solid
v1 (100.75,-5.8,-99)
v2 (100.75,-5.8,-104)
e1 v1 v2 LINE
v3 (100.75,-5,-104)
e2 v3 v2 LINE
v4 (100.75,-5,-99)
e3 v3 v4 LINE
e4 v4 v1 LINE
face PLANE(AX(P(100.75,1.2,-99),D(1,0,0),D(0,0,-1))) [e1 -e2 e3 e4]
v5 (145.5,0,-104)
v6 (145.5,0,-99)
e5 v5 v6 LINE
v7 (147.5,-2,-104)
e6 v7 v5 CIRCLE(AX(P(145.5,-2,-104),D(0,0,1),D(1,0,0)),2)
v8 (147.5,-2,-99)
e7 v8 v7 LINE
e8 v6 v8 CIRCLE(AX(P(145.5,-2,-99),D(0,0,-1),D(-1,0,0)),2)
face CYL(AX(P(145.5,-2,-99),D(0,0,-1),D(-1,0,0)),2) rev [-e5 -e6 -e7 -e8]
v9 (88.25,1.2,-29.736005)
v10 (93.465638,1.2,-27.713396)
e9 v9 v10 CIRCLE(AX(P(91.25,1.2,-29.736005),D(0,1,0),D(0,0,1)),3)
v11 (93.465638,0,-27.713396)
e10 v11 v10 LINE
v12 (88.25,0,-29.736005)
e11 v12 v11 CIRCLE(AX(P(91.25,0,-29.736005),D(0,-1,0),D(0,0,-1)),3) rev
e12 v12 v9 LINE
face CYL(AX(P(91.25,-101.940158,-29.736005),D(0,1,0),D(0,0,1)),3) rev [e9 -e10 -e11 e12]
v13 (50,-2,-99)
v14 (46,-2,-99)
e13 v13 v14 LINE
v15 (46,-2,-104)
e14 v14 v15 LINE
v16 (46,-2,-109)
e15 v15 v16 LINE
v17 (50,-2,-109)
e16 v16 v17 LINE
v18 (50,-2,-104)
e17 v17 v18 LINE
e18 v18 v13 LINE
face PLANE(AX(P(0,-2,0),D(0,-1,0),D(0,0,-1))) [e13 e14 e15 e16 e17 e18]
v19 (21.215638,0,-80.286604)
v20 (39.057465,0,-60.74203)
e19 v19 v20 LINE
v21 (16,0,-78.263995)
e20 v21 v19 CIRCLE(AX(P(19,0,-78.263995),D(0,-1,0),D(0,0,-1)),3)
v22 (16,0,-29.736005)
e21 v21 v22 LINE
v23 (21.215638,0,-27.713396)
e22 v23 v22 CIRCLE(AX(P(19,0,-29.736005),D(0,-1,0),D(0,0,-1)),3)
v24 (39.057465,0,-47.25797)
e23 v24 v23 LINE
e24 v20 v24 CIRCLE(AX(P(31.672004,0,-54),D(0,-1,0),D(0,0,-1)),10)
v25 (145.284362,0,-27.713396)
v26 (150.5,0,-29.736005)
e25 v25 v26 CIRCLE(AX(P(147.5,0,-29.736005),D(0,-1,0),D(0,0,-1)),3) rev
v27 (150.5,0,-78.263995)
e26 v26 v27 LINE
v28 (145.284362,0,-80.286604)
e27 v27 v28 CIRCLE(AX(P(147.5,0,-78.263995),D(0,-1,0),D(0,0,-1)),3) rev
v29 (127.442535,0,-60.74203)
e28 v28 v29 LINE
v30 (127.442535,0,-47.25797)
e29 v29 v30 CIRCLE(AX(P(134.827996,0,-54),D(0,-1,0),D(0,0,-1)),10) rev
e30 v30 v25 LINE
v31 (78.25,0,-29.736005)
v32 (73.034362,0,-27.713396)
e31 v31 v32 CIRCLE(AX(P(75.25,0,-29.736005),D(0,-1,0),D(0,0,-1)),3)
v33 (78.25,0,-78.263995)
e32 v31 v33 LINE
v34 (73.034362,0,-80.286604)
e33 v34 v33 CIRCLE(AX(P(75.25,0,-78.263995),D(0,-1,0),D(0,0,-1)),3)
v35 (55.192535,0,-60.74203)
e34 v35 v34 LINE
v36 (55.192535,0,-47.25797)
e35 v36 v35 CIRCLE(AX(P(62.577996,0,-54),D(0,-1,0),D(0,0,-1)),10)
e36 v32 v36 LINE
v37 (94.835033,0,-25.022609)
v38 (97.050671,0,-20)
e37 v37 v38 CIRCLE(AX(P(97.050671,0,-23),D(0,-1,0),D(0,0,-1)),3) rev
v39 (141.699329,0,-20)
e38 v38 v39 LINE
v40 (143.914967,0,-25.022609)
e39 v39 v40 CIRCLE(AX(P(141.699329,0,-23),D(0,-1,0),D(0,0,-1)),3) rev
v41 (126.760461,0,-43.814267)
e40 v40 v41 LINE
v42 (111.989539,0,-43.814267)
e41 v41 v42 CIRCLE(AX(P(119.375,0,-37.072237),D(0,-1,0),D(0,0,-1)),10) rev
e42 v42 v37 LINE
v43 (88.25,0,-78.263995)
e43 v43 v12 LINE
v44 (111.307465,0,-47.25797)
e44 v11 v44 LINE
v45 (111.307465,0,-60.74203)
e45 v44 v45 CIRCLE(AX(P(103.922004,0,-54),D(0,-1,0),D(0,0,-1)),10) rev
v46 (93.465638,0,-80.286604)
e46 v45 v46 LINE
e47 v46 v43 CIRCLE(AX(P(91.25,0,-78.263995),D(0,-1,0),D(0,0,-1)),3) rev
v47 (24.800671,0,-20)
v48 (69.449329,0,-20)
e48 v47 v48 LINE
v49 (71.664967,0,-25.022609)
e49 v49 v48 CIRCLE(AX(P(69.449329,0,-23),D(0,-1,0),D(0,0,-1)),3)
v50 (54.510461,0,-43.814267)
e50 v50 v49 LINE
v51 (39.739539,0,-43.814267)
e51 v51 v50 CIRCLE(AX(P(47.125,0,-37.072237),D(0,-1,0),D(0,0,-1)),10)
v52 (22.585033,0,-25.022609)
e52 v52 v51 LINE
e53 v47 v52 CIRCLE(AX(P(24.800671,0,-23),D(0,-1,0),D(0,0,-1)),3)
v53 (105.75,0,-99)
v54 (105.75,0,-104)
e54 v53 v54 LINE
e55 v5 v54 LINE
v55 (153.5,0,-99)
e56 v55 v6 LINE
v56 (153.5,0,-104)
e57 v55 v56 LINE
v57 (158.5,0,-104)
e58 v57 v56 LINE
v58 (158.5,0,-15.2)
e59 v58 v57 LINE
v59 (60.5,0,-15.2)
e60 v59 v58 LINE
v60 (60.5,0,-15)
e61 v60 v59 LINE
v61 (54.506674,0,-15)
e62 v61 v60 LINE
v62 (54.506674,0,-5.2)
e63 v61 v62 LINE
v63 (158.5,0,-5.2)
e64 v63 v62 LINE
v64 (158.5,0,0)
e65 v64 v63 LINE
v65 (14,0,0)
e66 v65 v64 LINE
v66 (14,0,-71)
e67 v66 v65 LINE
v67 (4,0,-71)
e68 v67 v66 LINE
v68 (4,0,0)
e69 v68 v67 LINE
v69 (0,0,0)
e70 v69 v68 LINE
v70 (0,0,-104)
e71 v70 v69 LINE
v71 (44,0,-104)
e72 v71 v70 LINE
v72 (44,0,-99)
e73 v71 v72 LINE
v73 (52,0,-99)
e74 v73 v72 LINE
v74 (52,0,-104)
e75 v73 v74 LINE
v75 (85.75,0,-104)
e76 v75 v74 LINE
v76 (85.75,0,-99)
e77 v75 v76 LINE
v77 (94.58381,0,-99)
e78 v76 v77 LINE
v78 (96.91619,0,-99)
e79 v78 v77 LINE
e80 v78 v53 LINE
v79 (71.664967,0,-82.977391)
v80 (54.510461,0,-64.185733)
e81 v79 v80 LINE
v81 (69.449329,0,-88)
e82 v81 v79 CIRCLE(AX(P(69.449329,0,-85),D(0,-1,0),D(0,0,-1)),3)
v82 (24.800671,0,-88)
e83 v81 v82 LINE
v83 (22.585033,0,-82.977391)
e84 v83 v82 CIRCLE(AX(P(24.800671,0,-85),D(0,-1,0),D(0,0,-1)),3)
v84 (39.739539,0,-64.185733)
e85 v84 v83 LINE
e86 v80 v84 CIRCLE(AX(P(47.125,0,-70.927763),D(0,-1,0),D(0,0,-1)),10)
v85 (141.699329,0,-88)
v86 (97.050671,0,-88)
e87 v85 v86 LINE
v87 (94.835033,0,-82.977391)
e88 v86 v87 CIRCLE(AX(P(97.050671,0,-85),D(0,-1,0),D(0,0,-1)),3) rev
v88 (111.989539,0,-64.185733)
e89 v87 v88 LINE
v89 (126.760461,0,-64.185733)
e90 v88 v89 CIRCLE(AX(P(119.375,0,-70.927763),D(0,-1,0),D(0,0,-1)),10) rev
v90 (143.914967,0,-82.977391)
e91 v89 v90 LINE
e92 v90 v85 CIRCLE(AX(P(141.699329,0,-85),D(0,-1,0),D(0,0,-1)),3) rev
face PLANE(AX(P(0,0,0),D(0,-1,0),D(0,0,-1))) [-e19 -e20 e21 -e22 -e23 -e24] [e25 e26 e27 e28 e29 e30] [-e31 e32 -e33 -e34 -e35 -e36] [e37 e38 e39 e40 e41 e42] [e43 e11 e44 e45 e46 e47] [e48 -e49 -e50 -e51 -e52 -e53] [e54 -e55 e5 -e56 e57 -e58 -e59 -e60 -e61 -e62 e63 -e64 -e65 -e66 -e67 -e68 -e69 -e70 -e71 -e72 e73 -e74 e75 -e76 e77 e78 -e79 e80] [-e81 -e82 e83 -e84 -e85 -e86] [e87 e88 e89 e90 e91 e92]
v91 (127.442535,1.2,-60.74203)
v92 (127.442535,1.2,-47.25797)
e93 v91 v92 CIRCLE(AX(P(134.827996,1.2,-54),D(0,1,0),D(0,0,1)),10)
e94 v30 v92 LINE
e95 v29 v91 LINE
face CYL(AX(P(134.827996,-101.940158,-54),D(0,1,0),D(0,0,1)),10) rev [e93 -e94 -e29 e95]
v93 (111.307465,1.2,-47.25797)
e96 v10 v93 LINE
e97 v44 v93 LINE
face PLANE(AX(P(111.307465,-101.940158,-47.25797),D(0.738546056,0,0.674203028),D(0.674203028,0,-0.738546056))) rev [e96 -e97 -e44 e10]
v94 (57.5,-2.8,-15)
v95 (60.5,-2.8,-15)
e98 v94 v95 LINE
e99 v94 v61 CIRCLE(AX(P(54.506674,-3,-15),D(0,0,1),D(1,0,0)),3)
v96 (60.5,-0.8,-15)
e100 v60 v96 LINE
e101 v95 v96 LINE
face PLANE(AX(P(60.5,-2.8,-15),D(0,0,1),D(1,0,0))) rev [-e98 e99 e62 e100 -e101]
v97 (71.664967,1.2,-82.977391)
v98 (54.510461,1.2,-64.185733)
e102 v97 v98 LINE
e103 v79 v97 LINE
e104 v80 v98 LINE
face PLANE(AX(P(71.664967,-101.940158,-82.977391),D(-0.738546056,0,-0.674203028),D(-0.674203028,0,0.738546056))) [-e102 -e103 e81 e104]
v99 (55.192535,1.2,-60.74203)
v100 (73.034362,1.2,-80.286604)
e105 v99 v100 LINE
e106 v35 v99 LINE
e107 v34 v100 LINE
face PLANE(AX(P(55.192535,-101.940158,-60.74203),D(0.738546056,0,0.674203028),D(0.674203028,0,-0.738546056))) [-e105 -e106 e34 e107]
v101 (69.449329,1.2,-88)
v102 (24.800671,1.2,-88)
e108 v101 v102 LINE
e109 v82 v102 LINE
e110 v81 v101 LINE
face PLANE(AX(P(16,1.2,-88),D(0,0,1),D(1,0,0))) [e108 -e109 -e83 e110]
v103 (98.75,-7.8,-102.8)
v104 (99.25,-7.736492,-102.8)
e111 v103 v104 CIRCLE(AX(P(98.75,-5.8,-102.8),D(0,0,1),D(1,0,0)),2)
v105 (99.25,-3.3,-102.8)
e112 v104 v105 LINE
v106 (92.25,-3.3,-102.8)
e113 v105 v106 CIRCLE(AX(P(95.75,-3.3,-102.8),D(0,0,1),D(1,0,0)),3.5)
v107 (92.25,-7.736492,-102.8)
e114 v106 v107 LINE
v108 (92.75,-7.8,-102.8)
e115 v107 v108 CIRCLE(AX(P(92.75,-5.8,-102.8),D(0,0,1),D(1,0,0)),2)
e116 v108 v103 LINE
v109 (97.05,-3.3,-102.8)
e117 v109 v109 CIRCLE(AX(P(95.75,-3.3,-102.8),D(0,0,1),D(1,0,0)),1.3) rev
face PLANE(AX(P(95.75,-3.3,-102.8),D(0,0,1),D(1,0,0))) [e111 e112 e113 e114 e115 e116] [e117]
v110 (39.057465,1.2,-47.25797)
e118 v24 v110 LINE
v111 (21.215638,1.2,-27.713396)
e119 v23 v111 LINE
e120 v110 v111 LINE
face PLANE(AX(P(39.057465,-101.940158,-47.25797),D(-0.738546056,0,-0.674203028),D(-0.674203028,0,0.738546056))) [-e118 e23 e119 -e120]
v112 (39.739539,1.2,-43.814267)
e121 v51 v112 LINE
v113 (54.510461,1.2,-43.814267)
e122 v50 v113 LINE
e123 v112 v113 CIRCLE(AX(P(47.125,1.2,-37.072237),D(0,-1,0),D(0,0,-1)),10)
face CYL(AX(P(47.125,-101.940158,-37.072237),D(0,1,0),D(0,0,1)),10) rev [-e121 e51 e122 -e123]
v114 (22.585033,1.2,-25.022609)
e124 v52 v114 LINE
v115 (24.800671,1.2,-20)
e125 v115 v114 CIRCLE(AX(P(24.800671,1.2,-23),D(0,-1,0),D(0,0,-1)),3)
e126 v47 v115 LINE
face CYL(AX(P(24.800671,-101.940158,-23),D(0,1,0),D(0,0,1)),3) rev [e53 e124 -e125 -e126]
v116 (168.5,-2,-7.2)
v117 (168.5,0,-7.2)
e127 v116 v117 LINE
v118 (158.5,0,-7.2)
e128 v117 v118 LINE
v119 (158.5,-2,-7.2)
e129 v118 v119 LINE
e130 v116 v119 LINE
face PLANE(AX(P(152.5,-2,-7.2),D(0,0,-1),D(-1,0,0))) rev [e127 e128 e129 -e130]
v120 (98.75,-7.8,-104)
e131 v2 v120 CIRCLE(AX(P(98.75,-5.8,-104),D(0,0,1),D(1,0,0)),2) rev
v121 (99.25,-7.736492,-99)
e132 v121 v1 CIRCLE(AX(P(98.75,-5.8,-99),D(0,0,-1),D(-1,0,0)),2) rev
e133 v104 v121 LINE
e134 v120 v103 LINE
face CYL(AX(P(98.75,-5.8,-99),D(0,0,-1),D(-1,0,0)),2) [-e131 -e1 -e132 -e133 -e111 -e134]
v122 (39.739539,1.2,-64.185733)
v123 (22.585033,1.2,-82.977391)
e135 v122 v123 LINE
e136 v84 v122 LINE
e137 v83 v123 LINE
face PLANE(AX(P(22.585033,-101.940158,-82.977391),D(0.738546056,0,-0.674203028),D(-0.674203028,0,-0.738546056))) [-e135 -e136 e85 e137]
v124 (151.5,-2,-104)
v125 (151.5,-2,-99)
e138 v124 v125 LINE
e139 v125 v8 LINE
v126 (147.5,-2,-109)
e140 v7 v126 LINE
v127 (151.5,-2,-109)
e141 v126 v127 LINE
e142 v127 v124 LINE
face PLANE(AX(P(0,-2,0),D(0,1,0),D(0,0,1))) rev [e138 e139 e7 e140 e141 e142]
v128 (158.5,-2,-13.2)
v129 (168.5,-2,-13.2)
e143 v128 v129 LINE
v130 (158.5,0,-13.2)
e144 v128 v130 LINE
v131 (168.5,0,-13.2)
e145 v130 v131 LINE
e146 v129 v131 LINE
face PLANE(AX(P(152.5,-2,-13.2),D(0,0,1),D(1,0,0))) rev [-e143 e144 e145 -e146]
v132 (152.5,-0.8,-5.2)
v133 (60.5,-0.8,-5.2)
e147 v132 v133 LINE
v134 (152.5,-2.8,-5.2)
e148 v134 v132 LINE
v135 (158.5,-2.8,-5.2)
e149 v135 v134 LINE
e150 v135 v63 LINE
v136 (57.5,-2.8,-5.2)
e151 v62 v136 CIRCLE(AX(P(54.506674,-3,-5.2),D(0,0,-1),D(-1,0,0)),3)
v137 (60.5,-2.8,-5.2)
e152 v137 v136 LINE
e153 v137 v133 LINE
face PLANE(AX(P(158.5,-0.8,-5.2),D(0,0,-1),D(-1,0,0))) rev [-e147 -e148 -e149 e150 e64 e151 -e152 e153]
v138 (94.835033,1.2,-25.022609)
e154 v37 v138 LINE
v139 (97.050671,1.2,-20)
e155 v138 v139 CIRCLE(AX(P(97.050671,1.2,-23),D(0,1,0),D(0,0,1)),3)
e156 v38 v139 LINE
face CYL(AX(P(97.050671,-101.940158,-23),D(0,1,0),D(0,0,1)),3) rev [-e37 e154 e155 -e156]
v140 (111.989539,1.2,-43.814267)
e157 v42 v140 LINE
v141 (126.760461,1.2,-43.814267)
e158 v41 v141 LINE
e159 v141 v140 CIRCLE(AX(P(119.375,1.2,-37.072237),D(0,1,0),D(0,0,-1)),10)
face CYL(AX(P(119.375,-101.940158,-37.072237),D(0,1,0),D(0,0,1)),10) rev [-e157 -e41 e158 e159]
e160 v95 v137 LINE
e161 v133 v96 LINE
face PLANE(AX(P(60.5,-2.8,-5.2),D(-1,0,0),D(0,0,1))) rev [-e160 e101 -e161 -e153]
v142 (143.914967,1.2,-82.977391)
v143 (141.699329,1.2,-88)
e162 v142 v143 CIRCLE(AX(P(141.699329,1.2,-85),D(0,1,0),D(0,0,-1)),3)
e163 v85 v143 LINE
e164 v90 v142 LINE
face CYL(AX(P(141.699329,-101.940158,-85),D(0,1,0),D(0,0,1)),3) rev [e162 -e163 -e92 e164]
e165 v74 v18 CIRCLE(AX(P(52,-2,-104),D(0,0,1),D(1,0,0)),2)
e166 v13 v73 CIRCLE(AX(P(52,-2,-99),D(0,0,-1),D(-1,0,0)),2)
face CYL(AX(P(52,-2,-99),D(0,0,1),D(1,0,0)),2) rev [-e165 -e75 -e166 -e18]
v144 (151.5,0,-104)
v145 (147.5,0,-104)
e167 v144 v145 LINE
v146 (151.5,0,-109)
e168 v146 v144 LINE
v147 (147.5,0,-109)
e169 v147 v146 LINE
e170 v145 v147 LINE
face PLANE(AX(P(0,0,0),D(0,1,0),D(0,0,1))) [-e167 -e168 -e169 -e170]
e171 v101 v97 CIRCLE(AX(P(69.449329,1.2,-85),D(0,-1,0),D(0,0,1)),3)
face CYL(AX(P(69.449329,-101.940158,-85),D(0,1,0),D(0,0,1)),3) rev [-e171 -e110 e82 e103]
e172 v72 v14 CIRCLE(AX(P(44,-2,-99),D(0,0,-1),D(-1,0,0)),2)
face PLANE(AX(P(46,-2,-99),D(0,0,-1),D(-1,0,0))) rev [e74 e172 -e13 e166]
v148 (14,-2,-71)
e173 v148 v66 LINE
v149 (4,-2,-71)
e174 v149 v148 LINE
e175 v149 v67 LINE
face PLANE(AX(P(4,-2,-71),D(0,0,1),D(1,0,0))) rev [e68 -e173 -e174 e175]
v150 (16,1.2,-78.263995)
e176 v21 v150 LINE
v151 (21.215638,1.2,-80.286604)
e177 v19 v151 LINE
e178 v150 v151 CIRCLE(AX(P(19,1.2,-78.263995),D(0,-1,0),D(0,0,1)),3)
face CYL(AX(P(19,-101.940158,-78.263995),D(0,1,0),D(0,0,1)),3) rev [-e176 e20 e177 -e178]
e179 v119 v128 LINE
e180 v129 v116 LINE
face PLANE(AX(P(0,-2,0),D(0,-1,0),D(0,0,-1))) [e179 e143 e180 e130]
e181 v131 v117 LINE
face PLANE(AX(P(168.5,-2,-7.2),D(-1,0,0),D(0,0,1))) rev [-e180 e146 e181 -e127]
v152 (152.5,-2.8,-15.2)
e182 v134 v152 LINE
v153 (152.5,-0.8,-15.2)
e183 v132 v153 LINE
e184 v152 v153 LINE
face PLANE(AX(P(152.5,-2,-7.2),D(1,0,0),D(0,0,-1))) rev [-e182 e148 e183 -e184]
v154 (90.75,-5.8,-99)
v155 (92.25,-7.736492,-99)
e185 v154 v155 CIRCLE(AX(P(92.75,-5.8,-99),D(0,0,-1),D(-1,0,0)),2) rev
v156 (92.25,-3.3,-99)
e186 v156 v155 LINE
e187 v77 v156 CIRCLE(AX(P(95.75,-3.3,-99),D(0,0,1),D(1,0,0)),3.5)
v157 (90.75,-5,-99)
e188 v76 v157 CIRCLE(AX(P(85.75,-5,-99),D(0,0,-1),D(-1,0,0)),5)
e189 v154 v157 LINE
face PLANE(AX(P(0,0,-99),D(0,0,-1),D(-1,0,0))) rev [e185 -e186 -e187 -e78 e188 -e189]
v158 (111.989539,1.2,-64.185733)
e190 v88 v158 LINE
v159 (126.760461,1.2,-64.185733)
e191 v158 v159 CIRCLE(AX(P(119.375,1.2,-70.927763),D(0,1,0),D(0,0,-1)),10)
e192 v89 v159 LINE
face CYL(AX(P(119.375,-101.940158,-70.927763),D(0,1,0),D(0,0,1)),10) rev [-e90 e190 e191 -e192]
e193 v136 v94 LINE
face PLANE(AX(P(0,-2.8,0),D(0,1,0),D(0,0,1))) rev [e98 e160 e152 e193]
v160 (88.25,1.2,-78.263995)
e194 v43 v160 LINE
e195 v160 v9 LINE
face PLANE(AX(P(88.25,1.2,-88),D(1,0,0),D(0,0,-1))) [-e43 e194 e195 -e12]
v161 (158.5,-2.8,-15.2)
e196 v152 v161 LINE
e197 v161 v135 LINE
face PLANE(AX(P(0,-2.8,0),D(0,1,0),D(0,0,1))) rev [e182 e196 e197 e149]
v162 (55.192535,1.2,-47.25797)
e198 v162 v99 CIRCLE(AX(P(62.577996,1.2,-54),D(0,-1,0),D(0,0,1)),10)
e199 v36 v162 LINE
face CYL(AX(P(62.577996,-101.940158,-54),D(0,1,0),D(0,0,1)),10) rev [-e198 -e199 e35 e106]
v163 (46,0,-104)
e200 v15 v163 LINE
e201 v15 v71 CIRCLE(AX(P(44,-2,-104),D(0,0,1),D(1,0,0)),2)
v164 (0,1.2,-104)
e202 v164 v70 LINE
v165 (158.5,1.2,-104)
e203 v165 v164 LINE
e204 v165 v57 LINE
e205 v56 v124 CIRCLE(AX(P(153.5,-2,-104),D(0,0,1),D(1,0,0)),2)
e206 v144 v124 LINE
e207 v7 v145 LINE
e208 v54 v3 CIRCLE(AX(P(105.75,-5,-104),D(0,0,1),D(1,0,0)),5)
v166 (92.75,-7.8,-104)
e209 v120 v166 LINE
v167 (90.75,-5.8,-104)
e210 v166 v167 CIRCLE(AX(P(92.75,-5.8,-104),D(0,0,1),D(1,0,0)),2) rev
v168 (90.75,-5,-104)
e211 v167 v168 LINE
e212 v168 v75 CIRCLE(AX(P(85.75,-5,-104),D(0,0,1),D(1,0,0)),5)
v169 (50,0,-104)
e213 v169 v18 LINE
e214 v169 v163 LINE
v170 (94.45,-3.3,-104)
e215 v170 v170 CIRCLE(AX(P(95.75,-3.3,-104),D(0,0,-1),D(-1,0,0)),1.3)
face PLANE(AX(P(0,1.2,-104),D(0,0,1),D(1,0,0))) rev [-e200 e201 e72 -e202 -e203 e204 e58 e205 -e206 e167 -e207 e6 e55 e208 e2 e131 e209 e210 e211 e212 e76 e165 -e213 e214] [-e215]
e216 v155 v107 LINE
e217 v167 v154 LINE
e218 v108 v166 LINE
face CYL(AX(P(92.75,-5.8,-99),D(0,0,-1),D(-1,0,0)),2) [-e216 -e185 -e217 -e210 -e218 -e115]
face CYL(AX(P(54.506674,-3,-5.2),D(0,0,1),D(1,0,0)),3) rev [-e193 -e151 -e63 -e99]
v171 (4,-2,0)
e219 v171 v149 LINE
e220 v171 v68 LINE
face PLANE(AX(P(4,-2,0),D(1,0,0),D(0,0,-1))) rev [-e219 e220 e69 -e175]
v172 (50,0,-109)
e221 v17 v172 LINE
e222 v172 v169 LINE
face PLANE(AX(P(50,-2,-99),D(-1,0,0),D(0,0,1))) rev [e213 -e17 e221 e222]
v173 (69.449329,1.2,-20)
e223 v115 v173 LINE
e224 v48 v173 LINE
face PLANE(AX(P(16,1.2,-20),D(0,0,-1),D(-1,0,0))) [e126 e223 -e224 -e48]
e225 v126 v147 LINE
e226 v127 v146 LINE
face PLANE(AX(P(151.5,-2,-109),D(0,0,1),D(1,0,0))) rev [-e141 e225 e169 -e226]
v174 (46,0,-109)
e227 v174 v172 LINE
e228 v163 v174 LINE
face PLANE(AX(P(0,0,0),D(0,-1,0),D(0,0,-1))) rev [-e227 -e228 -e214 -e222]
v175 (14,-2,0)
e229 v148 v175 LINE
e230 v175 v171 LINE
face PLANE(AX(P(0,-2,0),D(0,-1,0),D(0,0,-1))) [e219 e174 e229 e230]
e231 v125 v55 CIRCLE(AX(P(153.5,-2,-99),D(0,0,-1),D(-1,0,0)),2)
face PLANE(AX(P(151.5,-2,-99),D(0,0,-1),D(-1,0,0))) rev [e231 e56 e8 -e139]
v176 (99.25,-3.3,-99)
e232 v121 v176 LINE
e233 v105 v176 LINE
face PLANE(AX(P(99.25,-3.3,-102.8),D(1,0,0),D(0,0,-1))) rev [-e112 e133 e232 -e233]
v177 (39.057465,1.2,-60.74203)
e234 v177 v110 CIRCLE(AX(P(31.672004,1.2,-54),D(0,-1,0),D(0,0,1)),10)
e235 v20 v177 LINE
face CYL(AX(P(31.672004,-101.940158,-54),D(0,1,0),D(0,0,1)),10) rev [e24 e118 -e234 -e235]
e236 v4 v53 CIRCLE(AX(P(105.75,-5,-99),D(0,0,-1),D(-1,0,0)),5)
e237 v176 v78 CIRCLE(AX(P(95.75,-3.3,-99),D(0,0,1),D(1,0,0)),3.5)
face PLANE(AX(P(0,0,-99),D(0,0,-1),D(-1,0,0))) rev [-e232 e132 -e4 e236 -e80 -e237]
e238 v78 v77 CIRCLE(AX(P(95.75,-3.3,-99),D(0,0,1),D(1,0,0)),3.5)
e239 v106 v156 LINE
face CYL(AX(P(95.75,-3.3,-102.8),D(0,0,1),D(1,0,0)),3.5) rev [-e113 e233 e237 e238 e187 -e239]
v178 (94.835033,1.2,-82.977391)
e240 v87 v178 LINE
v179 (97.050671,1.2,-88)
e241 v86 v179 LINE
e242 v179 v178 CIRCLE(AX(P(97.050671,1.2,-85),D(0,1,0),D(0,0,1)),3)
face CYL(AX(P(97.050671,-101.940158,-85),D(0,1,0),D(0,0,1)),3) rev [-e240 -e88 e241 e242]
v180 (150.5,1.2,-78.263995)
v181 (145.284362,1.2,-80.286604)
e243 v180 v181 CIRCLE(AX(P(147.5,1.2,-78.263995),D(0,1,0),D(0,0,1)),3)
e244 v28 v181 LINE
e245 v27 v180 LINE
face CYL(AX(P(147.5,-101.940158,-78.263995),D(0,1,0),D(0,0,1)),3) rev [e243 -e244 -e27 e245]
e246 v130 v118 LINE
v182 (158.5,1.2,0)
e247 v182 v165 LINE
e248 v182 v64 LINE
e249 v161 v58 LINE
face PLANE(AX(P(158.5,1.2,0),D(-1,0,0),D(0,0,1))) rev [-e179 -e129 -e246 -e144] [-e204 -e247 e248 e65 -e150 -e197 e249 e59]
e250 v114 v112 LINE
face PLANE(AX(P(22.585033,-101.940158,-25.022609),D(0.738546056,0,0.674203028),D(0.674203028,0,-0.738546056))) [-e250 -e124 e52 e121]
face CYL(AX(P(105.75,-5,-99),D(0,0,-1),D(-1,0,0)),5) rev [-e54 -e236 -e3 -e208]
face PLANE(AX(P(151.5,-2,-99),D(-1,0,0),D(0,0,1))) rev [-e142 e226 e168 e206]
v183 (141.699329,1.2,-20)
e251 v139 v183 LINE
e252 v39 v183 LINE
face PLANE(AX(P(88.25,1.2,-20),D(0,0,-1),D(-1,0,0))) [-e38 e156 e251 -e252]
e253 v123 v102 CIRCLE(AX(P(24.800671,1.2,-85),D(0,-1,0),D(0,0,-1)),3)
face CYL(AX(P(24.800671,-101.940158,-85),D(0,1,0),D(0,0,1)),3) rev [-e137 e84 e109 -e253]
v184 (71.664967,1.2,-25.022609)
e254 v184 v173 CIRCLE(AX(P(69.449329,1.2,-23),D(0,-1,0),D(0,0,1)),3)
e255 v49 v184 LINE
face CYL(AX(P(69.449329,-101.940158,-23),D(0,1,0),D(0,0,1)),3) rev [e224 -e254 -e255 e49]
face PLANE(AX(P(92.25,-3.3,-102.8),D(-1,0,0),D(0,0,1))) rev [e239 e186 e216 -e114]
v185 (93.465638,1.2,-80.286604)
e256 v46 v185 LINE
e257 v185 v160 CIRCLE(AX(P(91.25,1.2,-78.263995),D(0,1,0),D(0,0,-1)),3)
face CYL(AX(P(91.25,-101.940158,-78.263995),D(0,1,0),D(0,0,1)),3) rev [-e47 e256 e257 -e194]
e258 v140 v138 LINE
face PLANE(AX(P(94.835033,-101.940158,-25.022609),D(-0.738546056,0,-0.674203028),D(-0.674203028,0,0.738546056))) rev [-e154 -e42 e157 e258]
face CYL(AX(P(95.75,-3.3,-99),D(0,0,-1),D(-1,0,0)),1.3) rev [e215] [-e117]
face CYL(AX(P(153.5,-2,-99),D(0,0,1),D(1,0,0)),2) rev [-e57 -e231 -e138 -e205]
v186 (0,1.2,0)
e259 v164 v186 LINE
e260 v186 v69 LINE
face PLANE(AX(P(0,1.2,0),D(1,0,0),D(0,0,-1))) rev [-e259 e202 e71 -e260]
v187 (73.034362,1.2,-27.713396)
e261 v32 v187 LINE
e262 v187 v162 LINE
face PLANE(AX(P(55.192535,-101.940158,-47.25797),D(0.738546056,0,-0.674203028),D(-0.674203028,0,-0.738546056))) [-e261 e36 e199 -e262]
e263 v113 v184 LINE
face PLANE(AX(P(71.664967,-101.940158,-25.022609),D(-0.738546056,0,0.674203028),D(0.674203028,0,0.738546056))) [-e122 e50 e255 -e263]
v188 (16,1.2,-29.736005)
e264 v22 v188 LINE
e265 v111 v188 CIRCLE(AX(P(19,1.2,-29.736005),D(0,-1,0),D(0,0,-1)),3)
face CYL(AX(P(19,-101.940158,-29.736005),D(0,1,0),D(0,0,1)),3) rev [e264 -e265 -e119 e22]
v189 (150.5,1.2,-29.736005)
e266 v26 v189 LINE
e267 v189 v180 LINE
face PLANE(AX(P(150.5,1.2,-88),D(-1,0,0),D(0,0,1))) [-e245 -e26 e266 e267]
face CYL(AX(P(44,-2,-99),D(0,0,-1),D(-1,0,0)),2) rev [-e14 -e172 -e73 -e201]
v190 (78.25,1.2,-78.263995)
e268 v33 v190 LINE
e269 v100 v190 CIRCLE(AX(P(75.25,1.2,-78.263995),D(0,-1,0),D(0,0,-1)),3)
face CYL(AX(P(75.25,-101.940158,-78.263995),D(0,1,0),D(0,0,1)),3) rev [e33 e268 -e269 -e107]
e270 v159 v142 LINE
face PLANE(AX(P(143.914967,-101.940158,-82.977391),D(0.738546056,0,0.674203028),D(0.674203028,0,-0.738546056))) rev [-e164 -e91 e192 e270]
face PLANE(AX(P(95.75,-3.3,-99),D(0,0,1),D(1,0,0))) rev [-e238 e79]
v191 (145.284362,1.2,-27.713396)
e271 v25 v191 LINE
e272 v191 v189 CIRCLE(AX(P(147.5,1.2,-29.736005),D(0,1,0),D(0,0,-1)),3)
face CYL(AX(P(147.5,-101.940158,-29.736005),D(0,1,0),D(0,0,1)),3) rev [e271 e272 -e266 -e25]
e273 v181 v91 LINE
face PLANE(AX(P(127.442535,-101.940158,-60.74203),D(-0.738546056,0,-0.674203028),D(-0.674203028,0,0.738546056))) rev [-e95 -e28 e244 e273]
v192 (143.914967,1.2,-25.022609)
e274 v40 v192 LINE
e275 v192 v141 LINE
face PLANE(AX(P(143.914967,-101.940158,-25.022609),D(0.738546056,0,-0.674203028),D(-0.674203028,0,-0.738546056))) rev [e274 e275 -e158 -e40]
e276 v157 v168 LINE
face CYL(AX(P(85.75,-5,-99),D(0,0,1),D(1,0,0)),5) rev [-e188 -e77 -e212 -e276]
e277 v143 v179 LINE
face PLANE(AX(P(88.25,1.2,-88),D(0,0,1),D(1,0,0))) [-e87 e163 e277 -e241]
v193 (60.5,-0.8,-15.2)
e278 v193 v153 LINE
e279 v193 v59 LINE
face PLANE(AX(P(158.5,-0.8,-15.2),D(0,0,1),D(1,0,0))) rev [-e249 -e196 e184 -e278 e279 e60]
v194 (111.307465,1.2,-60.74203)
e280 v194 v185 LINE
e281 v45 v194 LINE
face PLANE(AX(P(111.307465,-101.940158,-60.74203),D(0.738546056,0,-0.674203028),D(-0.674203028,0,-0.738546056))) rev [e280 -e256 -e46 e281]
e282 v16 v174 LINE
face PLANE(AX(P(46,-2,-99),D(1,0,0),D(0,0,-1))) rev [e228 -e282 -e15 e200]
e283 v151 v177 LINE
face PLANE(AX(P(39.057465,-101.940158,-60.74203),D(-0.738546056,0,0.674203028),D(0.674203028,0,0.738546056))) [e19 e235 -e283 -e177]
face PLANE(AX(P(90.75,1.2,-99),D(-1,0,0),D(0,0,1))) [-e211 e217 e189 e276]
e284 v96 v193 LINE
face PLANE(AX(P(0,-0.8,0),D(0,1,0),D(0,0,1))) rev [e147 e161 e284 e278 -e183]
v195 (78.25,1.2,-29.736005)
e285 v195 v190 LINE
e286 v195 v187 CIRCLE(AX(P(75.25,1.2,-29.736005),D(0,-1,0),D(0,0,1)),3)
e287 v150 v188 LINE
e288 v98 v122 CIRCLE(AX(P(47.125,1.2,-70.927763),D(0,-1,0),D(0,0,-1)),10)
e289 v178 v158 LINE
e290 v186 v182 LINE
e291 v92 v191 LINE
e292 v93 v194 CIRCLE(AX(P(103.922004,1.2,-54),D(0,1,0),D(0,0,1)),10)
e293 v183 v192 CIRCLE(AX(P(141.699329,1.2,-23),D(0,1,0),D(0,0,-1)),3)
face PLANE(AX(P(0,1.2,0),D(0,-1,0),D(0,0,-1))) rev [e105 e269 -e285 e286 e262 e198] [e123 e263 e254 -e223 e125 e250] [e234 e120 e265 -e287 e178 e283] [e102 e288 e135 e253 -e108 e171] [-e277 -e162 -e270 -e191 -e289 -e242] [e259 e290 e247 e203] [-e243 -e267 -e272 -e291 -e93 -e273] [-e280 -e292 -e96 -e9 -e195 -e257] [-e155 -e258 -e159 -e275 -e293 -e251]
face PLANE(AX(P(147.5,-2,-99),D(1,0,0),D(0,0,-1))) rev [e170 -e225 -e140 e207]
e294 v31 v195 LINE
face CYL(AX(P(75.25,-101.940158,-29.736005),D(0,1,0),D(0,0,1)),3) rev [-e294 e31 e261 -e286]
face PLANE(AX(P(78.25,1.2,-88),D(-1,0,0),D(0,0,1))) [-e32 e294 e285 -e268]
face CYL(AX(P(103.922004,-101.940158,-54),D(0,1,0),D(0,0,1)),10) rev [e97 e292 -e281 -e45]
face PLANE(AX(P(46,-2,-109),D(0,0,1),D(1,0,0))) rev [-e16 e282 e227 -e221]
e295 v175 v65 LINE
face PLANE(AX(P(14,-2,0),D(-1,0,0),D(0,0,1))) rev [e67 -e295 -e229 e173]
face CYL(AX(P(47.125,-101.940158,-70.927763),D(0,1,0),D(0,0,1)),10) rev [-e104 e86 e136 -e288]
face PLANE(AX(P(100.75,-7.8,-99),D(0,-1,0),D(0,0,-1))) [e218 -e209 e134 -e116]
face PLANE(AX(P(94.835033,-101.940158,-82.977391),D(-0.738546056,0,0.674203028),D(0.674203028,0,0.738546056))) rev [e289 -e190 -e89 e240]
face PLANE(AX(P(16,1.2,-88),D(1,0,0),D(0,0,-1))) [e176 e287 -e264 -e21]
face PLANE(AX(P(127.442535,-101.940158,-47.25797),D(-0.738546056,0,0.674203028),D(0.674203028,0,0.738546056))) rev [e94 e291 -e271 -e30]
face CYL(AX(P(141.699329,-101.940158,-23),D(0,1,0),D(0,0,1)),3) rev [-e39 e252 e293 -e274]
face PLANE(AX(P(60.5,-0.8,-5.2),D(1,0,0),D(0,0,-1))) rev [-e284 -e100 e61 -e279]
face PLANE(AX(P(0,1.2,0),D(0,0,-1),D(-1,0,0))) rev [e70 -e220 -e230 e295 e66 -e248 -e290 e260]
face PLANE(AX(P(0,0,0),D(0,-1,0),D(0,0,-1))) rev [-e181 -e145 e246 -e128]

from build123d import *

# Parameters (mm, degrees)
SKETCH1_W           = 158.5
SKETCH1_H           = 104
SKETCH1_W_2         = 62.25
SKETCH1_H_2         = 68
BOSS_EXTRUDE1_DEPTH = 1.2
SKETCH2_W           = 4
SKETCH2_H           = 10
BOSS_EXTRUDE2_DEPTH = 2
FILLET1_R           = 2
SKETCH3_W           = 10
SKETCH3_H           = 9
BOSS_EXTRUDE3_DEPTH = 5
SKETCH4_R           = 1.3
CUT_EXTRUDE1_DEPTH  = 5
CUT_EXTRUDE2_DEPTH  = 3.8
FILLET2_R           = 5
FILLET3_R           = 2
SKETCH6_W           = 98
SKETCH6_H           = 10
BOSS_EXTRUDE4_DEPTH = 0.8
SKETCH8_W           = 16
SKETCH8_H           = 6
BOSS_EXTRUDE5_DEPTH = 2
SKETCH9_W           = 6
SKETCH9_H           = 10
SKETCH9_W_2         = 3
SKETCH9_H_2         = 9.8
BOSS_EXTRUDE6_DEPTH = 2.8
FILLET4_R           = 3
SKETCH11_W          = 10
SKETCH11_H          = 71
BOSS_EXTRUDE7_DEPTH = 2
BOSS_EXTRUDE8_DEPTH = 1.2


# Some blends are built 0.0001 mm under size
with BuildPart() as part:
    # Sketch1 → Boss-Extrude1 (new body)
    with BuildSketch(Plane(origin=(0, 0, 0), x_dir=(1, 0, 0), z_dir=(0, 1, 0))):
        with Locations((79.25, 52)):
            Rectangle(SKETCH1_W, SKETCH1_H)
        with Locations((119.375, 54)):
            Rectangle(SKETCH1_W_2, SKETCH1_H_2, mode=Mode.SUBTRACT)
        with Locations((47.125, 54)):
            Rectangle(SKETCH1_W_2, SKETCH1_H_2, mode=Mode.SUBTRACT)
    extrude(amount=BOSS_EXTRUDE1_DEPTH)

    # Sketch2 → Boss-Extrude2 (add)
    with BuildSketch(Plane.XZ):
        with Locations((149.5, -104)):
            Rectangle(SKETCH2_W, SKETCH2_H)
        with Locations((48, -104)):
            Rectangle(SKETCH2_W, SKETCH2_H)
    extrude(amount=BOSS_EXTRUDE2_DEPTH)

    # Fillet1
    fillet1_edges = [part.edges().sort_by_distance(p)[0] for p in [
        (50, 0, -101.5),
        (46, 0, -101.5),
        (147.5, 0, -101.5),
        (151.5, 0, -101.5),
    ]]
    fillet(fillet1_edges, radius=FILLET1_R - 0.0001)  # a hair under: the kernel refuses the full size

    # Sketch3 → Boss-Extrude3 (add)
    with BuildSketch(Plane(origin=(0, 0, -104), x_dir=(-1, 0, 0), z_dir=(0, 0, -1))):
        with Locations((-95.75, -3.3)):
            Rectangle(SKETCH3_W, SKETCH3_H)
    extrude(amount=-BOSS_EXTRUDE3_DEPTH)

    # Sketch4 → Cut-Extrude1 (cut)
    with BuildSketch(Plane(origin=(0, 0, -104), x_dir=(-1, 0, 0), z_dir=(0, 0, -1))):
        with Locations((-95.75, -3.3)):
            Circle(SKETCH4_R)
    extrude(amount=-CUT_EXTRUDE1_DEPTH, mode=Mode.SUBTRACT)

    # Sketch5 → Cut-Extrude2 (cut)
    with BuildSketch(Plane.XY.offset(-99)):
        with BuildLine():
            Line((92.25, -3.3), (92.25, -7.8))
            Line((92.25, -7.8), (99.25, -7.8))
            Line((99.25, -7.8), (99.25, -3.3))
            ThreePointArc((99.25, -3.3), (95.75, 0.2), (92.25, -3.3))
        make_face()
    extrude(amount=-CUT_EXTRUDE2_DEPTH, mode=Mode.SUBTRACT)

    # Fillet2
    fillet2_edges = [part.edges().sort_by_distance(p)[0] for p in [
        (100.75, 0, -101.5),
        (90.75, 0, -101.5),
    ]]
    fillet(fillet2_edges, radius=FILLET2_R)

    # Fillet3
    fillet3_edges = [part.edges().sort_by_distance(p)[0] for p in [
        (90.75, -7.8, -101.5),
        (100.75, -7.8, -101.5),
    ]]
    fillet(fillet3_edges, radius=FILLET3_R)

    # Sketch6 → Boss-Extrude4 (add)
    with BuildSketch(Plane.XZ):
        with Locations((109.5, -10.2)):
            Rectangle(SKETCH6_W, SKETCH6_H)
    extrude(amount=BOSS_EXTRUDE4_DEPTH)

    # Sketch8 → Boss-Extrude5 (add)
    with BuildSketch(Plane.XZ):
        with Locations((160.5, -10.2)):
            Rectangle(SKETCH8_W, SKETCH8_H)
    extrude(amount=BOSS_EXTRUDE5_DEPTH)

    # Sketch9 → Boss-Extrude6 (add)
    with BuildSketch(Plane.XZ):
        with Locations((155.5, -10.2)):
            Rectangle(SKETCH9_W, SKETCH9_H)
        with Locations((59, -10.1)):
            Rectangle(SKETCH9_W_2, SKETCH9_H_2)
    extrude(amount=BOSS_EXTRUDE6_DEPTH)

    # Fillet4
    # the kernel refuses this fillet: 3 mm, written as the material it adds along each edge
    with BuildSketch(Plane(origin=(57.5, 0, -5.2), x_dir=(-1, 0, 0), z_dir=(0, 0, -1))) as fillet4_piece_1:
        with BuildLine():
            CenterArc((2.993325909, -3), FILLET4_R, 90, 86.177446271)
            Line((0, -2.8), (-0.059866518, -2.796))
            ThreePointArc((-0.059866518, -2.796), (-0.06, -1.4), (-0.06, 0))
            Line((-0.06, 0), (0, 0.06))
            Line((0, 0.06), (2.993325909, 0.06))
            Line((2.993325909, 0.06), (2.993325909, 0))
        make_face()
    extrude(amount=9.8)

    # Sketch11 → Boss-Extrude7 (add)
    with BuildSketch(Plane.XZ):
        with Locations((9, -35.5)):
            Rectangle(SKETCH11_W, SKETCH11_H)
    extrude(amount=BOSS_EXTRUDE7_DEPTH)

    # Sketch12 → Boss-Extrude8 (add)
    with BuildSketch(Plane(origin=(0, 1.2, 0), x_dir=(1, 0, 0), z_dir=(0, 1, 0))):
        with BuildLine():
            Line((22.585033293, 82.977390915), (39.739539441, 64.185732728))
            ThreePointArc((39.739539441, 64.185732728), (47.125, 60.927763011), (54.510460559, 64.185732728))
            Line((54.510460559, 64.185732728), (71.664966707, 82.977390915))
            ThreePointArc((71.664966707, 82.977390915), (72.194126096, 86.210820537), (69.449328539, 88))
            Line((69.449328539, 88), (53.452699296, 88))
            Line((53.452699296, 88), (53.452699296, 91.208733434))
            Line((53.452699296, 91.208733434), (81.121703178, 91.208733434))
            Line((81.121703178, 91.208733434), (81.121703178, 63.398815268))
            Line((81.121703178, 63.398815268), (78.25, 63.398815268))
            Line((78.25, 63.398815268), (78.25, 78.263994748))
            ThreePointArc((78.25, 78.263994748), (76.334685553, 81.061039126), (73.034361832, 80.286603833))
            Line((73.034361832, 80.286603833), (55.19253522, 60.742030283))
            ThreePointArc((55.19253522, 60.742030283), (52.577995779, 54), (55.19253522, 47.257969717))
            Line((55.19253522, 47.257969717), (73.034361832, 27.713396167))
            ThreePointArc((73.034361832, 27.713396167), (76.334685553, 26.938960874), (78.25, 29.736005252))
            Line((78.25, 29.736005252), (78.25, 51.032908731))
            Line((78.25, 51.032908731), (81.121703178, 51.032908731))
            Line((81.121703178, 51.032908731), (81.121703178, 16.832253351))
            Line((81.121703178, 16.832253351), (49.123041709, 16.832253351))
            Line((49.123041709, 16.832253351), (49.123041709, 20))
            Line((49.123041709, 20), (69.449328539, 20))
            ThreePointArc((69.449328539, 20), (72.194126096, 21.789179463), (71.664966707, 25.022609085))
            Line((71.664966707, 25.022609085), (54.510460559, 43.814267272))
            ThreePointArc((54.510460559, 43.814267272), (47.125, 47.072236989), (39.739539441, 43.814267272))
            Line((39.739539441, 43.814267272), (22.585033293, 25.022609085))
            ThreePointArc((22.585033293, 25.022609085), (22.055873904, 21.789179463), (24.800671461, 20))
            Line((24.800671461, 20), (42.917495227, 20))
            Line((42.917495227, 20), (42.917495227, 16.832253351))
            Line((42.917495227, 16.832253351), (11.408469589, 16.832253351))
            Line((11.408469589, 16.832253351), (11.408469589, 46.938752597))
            Line((11.408469589, 46.938752597), (16, 46.938752597))
            Line((16, 46.938752597), (16, 29.736005252))
            ThreePointArc((16, 29.736005252), (17.915314447, 26.938960874), (21.215638168, 27.713396167))
            Line((21.215638168, 27.713396167), (39.05746478, 47.257969717))
            ThreePointArc((39.05746478, 47.257969717), (41.672004221, 54), (39.05746478, 60.742030283))
            Line((39.05746478, 60.742030283), (21.215638168, 80.286603833))
            ThreePointArc((21.215638168, 80.286603833), (17.915314447, 81.061039126), (16, 78.263994748))
            Line((16, 78.263994748), (16, 63.398815268))
            Line((16, 63.398815268), (11.408469589, 63.398815268))
            Line((11.408469589, 63.398815268), (11.408469589, 91.208733434))
            Line((11.408469589, 91.208733434), (44.179781607, 91.208733434))
            Line((44.179781607, 91.208733434), (44.179781607, 88))
            Line((44.179781607, 88), (24.800671461, 88))
            ThreePointArc((24.800671461, 88), (22.055873904, 86.210820537), (22.585033293, 82.977390915))
        make_face()
    boss_extrude8 = extrude(amount=-BOSS_EXTRUDE8_DEPTH)

    # Mirror1: Boss-Extrude8 across plane
    add(boss_extrude8.mirror(Plane(origin=(83.25, 0, 0), x_dir=(0, 0, 1), z_dir=(1, 0, 0))))


solid = part.part
